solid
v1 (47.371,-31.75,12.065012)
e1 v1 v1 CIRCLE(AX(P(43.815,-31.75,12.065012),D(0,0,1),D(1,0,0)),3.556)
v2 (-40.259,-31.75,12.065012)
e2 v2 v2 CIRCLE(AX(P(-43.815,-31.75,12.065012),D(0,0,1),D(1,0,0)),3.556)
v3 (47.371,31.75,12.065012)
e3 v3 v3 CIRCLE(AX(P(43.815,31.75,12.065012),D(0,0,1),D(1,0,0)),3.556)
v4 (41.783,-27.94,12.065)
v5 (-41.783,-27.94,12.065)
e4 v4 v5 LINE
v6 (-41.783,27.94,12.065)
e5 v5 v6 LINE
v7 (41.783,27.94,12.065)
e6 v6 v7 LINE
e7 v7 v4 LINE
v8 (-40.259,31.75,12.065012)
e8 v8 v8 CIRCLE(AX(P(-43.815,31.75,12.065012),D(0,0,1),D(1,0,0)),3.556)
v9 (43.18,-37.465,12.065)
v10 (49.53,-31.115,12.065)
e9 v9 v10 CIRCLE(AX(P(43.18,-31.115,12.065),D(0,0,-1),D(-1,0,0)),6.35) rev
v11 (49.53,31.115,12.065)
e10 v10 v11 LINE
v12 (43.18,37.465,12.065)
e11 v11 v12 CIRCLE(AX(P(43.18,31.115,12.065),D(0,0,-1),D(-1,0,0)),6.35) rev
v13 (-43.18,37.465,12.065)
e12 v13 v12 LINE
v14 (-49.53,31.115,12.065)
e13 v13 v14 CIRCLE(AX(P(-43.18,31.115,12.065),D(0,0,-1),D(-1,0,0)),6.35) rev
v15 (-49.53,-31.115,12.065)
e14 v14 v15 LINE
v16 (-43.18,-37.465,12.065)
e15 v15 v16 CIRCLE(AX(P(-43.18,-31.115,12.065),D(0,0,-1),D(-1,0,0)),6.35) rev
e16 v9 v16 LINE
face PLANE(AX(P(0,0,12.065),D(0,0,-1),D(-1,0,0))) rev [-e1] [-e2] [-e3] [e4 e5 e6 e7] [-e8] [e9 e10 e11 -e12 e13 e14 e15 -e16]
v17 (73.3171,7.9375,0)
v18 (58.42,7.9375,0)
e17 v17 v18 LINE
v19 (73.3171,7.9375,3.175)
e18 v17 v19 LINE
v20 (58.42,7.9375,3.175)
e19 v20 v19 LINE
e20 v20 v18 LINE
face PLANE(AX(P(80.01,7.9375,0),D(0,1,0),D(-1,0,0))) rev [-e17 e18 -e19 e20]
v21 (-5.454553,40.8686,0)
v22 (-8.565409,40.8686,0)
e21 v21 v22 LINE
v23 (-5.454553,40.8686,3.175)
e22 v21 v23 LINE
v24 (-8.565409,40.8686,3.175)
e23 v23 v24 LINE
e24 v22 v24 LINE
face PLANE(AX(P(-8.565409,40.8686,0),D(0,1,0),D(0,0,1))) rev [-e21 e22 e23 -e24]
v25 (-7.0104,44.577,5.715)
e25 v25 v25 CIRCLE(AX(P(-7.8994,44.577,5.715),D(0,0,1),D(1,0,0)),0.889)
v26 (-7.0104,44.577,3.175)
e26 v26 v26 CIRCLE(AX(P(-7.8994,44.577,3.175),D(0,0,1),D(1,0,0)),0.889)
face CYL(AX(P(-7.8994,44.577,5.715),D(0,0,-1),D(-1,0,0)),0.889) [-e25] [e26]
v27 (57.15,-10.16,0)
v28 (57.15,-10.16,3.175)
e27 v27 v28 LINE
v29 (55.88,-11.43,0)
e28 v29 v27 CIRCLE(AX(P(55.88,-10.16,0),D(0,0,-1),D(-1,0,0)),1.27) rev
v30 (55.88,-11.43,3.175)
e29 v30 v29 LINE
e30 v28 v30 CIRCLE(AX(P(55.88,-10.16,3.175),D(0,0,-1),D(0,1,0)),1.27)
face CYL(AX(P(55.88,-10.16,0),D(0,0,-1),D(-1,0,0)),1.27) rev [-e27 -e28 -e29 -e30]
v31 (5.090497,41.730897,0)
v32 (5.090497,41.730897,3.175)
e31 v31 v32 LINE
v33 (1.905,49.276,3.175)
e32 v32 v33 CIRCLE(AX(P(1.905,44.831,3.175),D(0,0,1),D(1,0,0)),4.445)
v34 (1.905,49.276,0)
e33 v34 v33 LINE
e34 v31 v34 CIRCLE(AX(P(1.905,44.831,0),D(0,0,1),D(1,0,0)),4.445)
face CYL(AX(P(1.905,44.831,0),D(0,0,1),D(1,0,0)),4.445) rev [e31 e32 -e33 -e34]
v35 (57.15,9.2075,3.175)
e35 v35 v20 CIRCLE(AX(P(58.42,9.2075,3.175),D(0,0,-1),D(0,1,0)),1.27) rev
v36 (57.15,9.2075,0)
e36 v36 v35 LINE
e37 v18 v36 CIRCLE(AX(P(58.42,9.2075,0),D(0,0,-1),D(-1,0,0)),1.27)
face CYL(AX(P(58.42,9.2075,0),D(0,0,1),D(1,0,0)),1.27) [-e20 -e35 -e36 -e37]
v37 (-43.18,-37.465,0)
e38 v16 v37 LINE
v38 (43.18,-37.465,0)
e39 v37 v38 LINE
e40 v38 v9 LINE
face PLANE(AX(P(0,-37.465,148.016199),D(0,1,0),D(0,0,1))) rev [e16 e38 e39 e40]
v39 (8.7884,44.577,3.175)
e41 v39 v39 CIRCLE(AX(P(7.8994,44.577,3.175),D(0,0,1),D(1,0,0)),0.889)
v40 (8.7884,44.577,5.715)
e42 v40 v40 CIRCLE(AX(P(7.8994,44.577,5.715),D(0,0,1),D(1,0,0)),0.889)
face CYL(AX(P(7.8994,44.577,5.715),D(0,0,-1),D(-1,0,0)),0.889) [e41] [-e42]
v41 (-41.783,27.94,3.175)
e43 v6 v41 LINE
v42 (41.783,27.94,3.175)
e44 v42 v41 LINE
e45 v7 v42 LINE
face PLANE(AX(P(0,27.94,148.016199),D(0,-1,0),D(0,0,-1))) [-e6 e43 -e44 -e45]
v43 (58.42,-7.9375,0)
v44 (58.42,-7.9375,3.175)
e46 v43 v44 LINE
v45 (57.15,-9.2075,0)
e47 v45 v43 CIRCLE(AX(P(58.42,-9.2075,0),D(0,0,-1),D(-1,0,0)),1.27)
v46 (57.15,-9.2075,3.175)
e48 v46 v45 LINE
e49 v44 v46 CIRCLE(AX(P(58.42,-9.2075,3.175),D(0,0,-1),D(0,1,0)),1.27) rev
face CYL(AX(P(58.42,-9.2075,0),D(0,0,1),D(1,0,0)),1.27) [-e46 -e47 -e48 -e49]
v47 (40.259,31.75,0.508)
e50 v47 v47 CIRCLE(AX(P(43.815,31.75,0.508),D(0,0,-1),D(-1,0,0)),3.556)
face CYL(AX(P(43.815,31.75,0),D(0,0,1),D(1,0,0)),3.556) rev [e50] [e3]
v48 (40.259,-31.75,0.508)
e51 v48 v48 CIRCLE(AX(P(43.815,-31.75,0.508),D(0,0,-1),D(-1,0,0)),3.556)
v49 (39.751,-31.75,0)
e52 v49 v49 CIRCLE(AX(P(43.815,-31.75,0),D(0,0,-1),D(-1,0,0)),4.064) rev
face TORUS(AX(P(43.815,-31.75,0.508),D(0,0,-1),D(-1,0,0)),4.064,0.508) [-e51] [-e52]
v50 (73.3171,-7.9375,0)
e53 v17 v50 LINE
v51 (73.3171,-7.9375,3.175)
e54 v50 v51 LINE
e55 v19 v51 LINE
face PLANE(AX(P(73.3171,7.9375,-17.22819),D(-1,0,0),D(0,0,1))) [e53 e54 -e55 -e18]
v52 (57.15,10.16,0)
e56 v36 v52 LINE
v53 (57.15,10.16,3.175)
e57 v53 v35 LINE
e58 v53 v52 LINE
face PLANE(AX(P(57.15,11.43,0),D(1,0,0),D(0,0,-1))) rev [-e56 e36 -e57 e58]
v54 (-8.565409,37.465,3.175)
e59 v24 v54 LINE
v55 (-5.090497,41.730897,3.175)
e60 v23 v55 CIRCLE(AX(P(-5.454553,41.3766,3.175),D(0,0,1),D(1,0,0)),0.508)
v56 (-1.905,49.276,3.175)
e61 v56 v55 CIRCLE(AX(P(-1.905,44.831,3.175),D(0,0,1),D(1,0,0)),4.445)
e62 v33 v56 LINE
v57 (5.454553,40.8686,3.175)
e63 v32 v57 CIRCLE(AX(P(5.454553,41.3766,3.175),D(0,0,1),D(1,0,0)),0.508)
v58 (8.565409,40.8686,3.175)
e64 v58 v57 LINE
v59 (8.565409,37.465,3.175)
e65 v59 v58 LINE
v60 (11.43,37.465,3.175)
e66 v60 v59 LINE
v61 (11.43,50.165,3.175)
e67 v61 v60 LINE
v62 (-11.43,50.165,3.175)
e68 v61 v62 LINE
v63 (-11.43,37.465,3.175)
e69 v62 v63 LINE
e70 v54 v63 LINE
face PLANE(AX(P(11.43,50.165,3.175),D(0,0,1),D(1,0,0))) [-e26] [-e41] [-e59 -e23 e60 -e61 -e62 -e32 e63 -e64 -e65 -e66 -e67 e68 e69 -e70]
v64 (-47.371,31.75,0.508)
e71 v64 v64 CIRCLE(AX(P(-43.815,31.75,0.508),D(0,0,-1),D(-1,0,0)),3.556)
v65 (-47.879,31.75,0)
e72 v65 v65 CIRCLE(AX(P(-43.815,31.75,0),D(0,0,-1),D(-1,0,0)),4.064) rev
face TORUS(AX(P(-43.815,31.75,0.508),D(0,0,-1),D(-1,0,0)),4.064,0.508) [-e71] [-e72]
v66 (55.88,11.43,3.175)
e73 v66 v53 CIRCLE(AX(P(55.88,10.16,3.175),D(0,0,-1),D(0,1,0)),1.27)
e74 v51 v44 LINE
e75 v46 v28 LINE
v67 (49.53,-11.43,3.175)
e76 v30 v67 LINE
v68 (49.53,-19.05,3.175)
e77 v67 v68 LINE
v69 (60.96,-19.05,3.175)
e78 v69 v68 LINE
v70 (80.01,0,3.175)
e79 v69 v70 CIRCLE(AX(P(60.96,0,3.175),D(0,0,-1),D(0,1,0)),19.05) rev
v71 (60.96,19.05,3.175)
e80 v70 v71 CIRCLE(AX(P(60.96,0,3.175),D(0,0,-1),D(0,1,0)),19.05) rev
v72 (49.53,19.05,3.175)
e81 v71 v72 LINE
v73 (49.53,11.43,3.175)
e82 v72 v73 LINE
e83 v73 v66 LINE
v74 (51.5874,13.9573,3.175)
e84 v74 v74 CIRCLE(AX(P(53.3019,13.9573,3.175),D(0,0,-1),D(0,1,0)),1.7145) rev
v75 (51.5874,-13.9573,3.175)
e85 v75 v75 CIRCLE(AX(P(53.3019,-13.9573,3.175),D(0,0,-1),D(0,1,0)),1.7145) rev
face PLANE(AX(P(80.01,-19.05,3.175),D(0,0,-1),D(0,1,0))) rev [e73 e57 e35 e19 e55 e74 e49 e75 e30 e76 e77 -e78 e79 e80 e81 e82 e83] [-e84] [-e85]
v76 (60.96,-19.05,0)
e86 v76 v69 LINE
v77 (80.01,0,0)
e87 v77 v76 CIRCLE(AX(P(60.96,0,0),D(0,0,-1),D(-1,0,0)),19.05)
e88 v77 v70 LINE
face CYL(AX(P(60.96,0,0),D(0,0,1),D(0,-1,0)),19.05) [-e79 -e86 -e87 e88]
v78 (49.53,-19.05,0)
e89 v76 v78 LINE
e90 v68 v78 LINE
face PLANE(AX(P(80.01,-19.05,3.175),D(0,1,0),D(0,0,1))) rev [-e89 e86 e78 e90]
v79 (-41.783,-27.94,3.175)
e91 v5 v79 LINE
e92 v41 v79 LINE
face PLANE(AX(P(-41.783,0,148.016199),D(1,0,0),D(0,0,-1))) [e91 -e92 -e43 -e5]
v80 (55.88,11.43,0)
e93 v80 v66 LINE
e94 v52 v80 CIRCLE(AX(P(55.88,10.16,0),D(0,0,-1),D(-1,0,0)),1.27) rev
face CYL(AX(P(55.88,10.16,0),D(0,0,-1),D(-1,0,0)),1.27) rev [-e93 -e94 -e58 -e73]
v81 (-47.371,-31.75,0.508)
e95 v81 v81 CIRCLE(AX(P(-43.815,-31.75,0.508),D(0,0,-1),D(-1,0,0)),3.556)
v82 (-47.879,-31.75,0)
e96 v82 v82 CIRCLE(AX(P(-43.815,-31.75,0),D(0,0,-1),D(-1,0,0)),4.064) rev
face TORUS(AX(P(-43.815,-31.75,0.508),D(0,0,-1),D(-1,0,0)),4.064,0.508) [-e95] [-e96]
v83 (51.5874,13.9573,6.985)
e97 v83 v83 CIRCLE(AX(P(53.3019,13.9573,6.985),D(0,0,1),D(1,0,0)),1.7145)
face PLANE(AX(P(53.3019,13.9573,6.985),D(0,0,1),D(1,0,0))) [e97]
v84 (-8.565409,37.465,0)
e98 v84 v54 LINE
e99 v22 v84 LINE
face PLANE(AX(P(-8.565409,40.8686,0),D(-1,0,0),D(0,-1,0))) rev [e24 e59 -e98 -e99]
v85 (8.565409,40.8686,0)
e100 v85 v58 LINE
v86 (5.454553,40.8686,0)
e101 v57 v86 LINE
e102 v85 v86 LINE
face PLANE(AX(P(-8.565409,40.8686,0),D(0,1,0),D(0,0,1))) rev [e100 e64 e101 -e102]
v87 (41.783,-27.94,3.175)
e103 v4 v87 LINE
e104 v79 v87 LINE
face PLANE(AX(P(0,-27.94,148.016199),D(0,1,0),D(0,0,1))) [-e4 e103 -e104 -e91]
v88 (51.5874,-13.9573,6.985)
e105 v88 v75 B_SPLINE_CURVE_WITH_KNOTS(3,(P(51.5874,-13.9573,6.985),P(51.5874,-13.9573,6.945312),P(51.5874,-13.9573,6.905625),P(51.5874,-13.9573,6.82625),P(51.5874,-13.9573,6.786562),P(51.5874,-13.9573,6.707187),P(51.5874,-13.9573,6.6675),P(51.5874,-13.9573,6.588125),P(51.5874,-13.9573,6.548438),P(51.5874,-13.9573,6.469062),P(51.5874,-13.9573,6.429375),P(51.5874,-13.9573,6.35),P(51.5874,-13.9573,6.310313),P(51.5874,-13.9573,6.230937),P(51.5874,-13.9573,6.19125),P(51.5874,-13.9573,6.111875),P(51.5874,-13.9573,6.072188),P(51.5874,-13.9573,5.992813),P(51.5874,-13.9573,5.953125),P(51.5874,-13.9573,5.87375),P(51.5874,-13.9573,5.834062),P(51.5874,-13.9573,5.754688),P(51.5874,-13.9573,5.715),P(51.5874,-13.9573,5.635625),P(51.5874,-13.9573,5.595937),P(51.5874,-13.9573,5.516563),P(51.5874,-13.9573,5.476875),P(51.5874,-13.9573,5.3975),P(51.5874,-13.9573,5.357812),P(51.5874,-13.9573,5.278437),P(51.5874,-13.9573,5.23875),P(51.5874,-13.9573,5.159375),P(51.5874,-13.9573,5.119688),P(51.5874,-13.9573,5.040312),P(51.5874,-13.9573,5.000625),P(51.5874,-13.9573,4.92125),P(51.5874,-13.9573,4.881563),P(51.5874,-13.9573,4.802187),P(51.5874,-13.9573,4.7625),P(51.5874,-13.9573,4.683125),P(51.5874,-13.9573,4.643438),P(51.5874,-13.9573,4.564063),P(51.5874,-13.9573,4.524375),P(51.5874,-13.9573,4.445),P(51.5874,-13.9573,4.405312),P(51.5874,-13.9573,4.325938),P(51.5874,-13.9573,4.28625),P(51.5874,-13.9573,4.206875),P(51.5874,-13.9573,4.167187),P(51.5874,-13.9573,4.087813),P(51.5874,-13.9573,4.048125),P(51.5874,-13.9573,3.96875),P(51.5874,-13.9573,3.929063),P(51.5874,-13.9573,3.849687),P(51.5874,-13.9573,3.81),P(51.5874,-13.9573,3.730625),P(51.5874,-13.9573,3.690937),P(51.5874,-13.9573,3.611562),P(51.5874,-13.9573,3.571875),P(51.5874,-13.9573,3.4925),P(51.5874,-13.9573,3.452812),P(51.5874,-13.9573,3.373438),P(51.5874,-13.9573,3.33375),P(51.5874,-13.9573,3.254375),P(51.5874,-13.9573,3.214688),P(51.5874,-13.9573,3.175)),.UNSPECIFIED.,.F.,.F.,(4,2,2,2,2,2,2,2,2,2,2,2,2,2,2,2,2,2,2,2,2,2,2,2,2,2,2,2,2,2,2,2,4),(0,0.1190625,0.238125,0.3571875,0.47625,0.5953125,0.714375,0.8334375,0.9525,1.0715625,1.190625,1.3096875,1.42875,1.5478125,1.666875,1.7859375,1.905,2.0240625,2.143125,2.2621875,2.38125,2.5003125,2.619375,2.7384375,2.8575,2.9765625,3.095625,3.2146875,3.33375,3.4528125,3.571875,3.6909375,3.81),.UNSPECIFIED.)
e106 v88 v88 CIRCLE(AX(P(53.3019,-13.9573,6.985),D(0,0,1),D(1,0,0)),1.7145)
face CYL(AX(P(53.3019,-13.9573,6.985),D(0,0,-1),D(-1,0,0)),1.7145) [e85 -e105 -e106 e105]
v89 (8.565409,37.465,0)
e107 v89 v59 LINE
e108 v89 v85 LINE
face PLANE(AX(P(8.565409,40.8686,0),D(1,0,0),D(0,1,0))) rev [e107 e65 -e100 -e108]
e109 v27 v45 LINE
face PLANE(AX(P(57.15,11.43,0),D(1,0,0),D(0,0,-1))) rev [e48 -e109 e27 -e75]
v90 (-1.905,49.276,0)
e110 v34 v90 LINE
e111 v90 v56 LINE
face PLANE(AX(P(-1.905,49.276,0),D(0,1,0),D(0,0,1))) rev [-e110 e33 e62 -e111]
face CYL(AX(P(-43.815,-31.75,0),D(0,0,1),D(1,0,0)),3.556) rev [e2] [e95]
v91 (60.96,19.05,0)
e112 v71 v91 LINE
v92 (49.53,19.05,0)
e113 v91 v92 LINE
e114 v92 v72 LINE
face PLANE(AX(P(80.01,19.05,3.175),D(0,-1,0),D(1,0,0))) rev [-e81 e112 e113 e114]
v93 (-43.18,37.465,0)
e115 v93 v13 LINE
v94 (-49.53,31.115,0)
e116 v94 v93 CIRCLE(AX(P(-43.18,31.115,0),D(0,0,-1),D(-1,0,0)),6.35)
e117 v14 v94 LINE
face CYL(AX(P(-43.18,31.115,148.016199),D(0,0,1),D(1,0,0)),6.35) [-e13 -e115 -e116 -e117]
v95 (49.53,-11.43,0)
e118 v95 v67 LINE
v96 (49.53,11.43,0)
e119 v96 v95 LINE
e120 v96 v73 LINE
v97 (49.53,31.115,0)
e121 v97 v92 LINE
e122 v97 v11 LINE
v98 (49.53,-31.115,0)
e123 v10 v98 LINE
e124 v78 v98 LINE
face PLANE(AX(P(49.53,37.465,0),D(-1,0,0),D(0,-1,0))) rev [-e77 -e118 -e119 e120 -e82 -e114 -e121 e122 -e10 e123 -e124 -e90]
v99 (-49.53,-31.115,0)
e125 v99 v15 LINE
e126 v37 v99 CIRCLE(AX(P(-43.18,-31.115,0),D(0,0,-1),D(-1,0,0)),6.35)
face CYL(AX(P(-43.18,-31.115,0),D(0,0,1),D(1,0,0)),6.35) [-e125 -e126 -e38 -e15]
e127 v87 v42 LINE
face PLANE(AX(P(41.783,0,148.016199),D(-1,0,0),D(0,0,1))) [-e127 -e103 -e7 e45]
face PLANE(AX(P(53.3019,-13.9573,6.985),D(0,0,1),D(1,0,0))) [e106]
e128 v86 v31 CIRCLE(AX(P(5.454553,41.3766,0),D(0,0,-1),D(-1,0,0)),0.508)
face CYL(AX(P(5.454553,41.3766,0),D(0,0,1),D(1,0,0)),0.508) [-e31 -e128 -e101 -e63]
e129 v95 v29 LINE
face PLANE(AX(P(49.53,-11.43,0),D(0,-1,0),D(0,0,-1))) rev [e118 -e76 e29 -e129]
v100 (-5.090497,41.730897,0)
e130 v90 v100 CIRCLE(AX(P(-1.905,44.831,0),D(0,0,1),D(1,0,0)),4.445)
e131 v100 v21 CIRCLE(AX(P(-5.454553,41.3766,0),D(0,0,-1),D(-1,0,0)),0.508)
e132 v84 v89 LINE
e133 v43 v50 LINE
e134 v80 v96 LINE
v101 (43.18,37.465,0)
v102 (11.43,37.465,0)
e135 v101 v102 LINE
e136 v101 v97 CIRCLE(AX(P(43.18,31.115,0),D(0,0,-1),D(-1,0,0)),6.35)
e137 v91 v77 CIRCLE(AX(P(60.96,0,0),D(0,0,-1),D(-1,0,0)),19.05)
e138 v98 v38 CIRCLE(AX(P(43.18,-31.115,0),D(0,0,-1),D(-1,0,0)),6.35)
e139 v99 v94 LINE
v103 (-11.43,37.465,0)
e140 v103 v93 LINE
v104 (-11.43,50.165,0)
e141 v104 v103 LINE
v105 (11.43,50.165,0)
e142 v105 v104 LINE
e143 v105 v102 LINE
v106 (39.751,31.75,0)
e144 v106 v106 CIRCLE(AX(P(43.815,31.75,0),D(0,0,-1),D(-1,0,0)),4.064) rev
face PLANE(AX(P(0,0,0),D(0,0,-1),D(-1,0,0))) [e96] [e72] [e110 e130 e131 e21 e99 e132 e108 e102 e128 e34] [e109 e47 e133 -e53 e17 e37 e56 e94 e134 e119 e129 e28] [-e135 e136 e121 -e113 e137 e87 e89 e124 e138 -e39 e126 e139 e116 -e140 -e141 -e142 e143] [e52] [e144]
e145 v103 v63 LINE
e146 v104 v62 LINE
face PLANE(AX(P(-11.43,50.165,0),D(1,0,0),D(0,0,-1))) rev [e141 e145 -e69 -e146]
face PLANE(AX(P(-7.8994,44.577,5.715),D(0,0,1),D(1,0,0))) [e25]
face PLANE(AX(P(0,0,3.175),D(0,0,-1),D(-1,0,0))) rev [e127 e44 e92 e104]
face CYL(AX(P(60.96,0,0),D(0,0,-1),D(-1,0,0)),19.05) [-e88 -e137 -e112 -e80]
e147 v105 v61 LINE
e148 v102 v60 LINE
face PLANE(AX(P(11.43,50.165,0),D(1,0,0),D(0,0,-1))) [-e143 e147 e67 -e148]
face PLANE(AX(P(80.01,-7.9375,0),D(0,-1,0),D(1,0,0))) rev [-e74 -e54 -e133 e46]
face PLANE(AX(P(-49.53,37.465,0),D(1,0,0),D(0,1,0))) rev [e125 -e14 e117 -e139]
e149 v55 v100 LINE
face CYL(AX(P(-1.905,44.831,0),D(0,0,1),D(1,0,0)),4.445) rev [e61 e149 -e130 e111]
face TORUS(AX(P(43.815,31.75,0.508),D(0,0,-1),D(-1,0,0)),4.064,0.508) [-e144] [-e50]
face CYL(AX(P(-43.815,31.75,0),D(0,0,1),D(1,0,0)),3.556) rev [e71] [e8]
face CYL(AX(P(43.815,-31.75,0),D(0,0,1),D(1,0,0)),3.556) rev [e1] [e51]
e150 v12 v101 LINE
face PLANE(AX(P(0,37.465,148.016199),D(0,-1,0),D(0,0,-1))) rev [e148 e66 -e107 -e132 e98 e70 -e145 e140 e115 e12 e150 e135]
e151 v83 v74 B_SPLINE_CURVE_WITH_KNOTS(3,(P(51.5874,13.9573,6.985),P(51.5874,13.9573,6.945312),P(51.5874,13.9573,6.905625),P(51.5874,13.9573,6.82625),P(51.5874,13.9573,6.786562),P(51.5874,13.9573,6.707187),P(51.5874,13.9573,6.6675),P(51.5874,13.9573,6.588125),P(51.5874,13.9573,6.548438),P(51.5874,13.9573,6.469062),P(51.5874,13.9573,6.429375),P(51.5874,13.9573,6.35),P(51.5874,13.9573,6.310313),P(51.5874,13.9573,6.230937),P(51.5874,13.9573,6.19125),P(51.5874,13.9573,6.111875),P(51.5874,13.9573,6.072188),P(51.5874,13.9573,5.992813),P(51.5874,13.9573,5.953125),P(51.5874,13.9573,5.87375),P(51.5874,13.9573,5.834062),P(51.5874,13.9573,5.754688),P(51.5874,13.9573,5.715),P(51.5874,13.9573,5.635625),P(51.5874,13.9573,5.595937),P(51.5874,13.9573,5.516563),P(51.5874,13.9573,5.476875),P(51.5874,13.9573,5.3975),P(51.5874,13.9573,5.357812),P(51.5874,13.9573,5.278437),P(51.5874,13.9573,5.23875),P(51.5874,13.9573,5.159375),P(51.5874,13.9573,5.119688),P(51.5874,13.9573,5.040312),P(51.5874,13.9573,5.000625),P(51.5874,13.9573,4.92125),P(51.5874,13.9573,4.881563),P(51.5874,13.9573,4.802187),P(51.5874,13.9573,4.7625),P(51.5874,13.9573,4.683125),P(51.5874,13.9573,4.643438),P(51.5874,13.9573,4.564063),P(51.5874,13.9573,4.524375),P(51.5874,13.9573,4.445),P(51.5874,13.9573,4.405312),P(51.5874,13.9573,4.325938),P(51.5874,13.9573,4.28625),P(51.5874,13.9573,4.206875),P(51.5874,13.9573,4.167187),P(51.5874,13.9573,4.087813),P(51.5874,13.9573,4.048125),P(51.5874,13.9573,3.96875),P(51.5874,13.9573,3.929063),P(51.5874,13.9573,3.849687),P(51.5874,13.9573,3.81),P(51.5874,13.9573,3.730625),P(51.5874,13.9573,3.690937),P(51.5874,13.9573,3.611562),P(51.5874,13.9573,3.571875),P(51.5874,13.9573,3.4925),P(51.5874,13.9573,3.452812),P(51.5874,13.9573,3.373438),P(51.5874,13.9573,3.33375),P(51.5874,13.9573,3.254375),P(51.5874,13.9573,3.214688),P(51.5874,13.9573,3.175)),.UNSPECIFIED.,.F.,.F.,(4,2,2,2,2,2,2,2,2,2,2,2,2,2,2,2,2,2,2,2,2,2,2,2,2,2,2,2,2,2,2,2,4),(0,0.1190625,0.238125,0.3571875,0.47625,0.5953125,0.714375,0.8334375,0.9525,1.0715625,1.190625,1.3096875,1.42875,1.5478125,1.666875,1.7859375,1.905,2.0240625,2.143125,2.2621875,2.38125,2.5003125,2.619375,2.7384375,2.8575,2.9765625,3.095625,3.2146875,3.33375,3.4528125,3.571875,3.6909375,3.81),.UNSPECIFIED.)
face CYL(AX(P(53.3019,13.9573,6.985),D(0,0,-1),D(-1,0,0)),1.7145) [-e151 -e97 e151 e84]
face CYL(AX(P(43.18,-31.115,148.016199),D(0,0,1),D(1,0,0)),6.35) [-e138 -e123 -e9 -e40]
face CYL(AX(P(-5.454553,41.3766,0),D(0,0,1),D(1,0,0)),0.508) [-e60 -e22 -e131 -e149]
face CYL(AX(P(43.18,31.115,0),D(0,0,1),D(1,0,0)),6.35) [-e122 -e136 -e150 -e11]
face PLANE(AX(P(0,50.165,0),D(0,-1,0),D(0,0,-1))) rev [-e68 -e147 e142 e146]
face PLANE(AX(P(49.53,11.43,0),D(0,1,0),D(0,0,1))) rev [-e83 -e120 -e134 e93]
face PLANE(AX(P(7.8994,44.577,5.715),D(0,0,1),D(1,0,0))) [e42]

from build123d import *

# Parameters (mm, degrees)
SKETCH1_W               = 55.88
SKETCH1_H               = 83.566
BOSS_EXTRUDE1_DEPTH     = 3.175
SKETCH2_W               = 74.93
SKETCH2_H               = 102.616
SKETCH2_W_2             = 55.88
SKETCH2_H_2             = 83.566
BOSS_EXTRUDE2_DEPTH     = 12.065
CUT_EXTRUDE1_DEPTH      = 65.666075449
CUT_EXTRUDE1_DEPTH_BACK = 65.666075449
SKETCH3_R               = 3.556
CUT_EXTRUDE2_DEPTH      = 65.666075449
CUT_EXTRUDE2_DEPTH_BACK = 65.666075449
SKETCH4_W               = 1.778
SKETCH4_H               = 74.93
FILLET1_R               = 6.35
FILLET2_R               = 0.508
SKETCH5_W               = 38.1
SKETCH5_H               = 3.175
BOSS_EXTRUDE3_DEPTH     = 30.48
CUT_EXTRUDE3_DEPTH      = 89.793346738
CUT_EXTRUDE3_DEPTH_BACK = 89.793346738
SKETCH6_W               = 7.62
SKETCH6_H               = 22.86
SKETCH7_R               = 1.7145
BOSS_EXTRUDE4_DEPTH     = 3.81
CUT_EXTRUDE4_DEPTH      = 89.793346738
CUT_EXTRUDE4_DEPTH_BACK = 89.793346738
SKETCH8_W               = 22.86
SKETCH8_H               = 15.875
SKETCH9_W               = 6.6929
SKETCH9_H               = 15.875
BOSS_EXTRUDE5_DEPTH     = 3.175
FILLET3_R               = 19.05
FILLET5_R               = 1.27
SKETCH14_W              = 22.86
SKETCH14_H              = 3.175
BOSS_EXTRUDE8_DEPTH     = 12.7
CUT_EXTRUDE7_DEPTH      = 95.853357479
CUT_EXTRUDE7_DEPTH_BACK = 95.853357479
CUT_EXTRUDE8_DEPTH      = 95.853357479
CUT_EXTRUDE8_DEPTH_BACK = 95.853357479
SKETCH16_W              = 17.130818864
SKETCH16_H              = 3.4036
FILLET8_R               = 0.508
SKETCH17_R              = 0.889
BOSS_EXTRUDE9_DEPTH     = 2.54


with BuildPart() as part:
    # Sketch1 → Boss-Extrude1 (new body)
    with BuildSketch(Plane(origin=(0, 0, 0), x_dir=(0, 1, 0), z_dir=(0, 0, 1))):
        Rectangle(SKETCH1_W, SKETCH1_H)
    extrude(amount=BOSS_EXTRUDE1_DEPTH)

    # Sketch2 → Boss-Extrude2 (add)
    with BuildSketch(Plane(origin=(0, 0, 0), x_dir=(0, 1, 0), z_dir=(0, 0, 1))):
        Rectangle(SKETCH2_W, SKETCH2_H)
        Rectangle(SKETCH2_W_2, SKETCH2_H_2, mode=Mode.SUBTRACT)
    extrude(amount=BOSS_EXTRUDE2_DEPTH)

    # Sketch3 → Cut-Extrude1 (cut, two sides: drawn at the far end of the back side and taken through both)
    with BuildSketch(Plane.XY.offset(12.065).offset(-CUT_EXTRUDE1_DEPTH_BACK)):
        with Locations((-43.815, 31.75)):
            Circle(SKETCH3_R)
        with Locations((43.815, 31.75)):
            Circle(SKETCH3_R)
        with Locations((43.815, -31.75)):
            Circle(SKETCH3_R)
        with Locations((-43.815, -31.75)):
            Circle(SKETCH3_R)
    extrude(amount=CUT_EXTRUDE1_DEPTH + CUT_EXTRUDE1_DEPTH_BACK, mode=Mode.SUBTRACT)

    # Sketch4 → Cut-Extrude2 (cut, two sides: drawn at the far end of the back side and taken through both)
    with BuildSketch(Plane.XY.offset(12.065).offset(-CUT_EXTRUDE2_DEPTH_BACK)):
        with Locations((-50.419, 0)):
            Rectangle(SKETCH4_W, SKETCH4_H)
        with Locations((50.419, 0)):
            Rectangle(SKETCH4_W, SKETCH4_H)
    extrude(amount=CUT_EXTRUDE2_DEPTH + CUT_EXTRUDE2_DEPTH_BACK, mode=Mode.SUBTRACT)

    # Fillet1
    fillet1_edges = [part.edges().sort_by_distance(p)[0] for p in [
        (-49.53, -37.465, 6.0325),
        (-49.53, 37.465, 6.0325),
        (49.53, 37.465, 6.0325),
        (49.53, -37.465, 6.0325),
    ]]
    fillet(fillet1_edges, radius=FILLET1_R)

    # Fillet2
    fillet2_edges = [part.edges().sort_by_distance(p)[0] for p in [
        (-47.371, -31.75, 0),
        (40.259, -31.75, 0),
        (40.259, 31.75, 0),
        (-47.371, 31.75, 0),
    ]]
    fillet(fillet2_edges, radius=FILLET2_R)

    # Sketch5 → Boss-Extrude3 (add)
    with BuildSketch(Plane.YZ.offset(49.53)):
        with Locations((0, 1.5875)):
            Rectangle(SKETCH5_W, SKETCH5_H)
    extrude(amount=BOSS_EXTRUDE3_DEPTH)

    # Sketch6 → Cut-Extrude3 (cut, two sides: drawn at the far end of the back side and taken through both)
    with BuildSketch(Plane.XY.offset(3.175).offset(-CUT_EXTRUDE3_DEPTH_BACK)):
        with Locations((53.34, 0)):
            Rectangle(SKETCH6_W, SKETCH6_H)
    extrude(amount=CUT_EXTRUDE3_DEPTH + CUT_EXTRUDE3_DEPTH_BACK, mode=Mode.SUBTRACT)

    # Sketch7 → Boss-Extrude4 (add)
    with BuildSketch(Plane.XY.offset(3.175)):
        with Locations(Location((53.3019, 13.9573, 0), (0, 0, 180))):
            Circle(SKETCH7_R)
        with Locations(Location((53.3019, -13.9573, 0), (0, 0, 180))):
            Circle(SKETCH7_R)
    extrude(amount=BOSS_EXTRUDE4_DEPTH)

    # Sketch8 → Cut-Extrude4 (cut, two sides: drawn at the far end of the back side and taken through both)
    with BuildSketch(Plane.XY.offset(3.175).offset(-CUT_EXTRUDE4_DEPTH_BACK)):
        with Locations((68.58, 0)):
            Rectangle(SKETCH8_W, SKETCH8_H)
    extrude(amount=CUT_EXTRUDE4_DEPTH + CUT_EXTRUDE4_DEPTH_BACK, mode=Mode.SUBTRACT)

    # Sketch9 → Boss-Extrude5 (add)
    with BuildSketch(Plane.XY.offset(3.175)):
        with Locations((76.66355, 0)):
            Rectangle(SKETCH9_W, SKETCH9_H)
    extrude(amount=-BOSS_EXTRUDE5_DEPTH)

    # Fillet3
    fillet3_edges = [part.edges().sort_by_distance(p)[0] for p in [
        (80.01, -19.05, 1.5875),
        (80.01, 19.05, 1.5875),
    ]]
    fillet(fillet3_edges, radius=FILLET3_R - 0.0001)  # a hair under: the kernel refuses the full size

    # Fillet5
    fillet5_edges = [part.edges().sort_by_distance(p)[0] for p in [
        (57.15, 11.43, 1.5875),
        (57.15, -11.43, 1.5875),
        (57.15, 7.9375, 1.5875),
        (57.15, -7.9375, 1.5875),
    ]]
    fillet(fillet5_edges, radius=FILLET5_R)

    # Sketch14 → Boss-Extrude8 (add)
    with BuildSketch(Plane(origin=(0, 37.465, 0), x_dir=(-1, 0, 0), z_dir=(0, 1, 0))):
        with Locations((0, 1.5875)):
            Rectangle(SKETCH14_W, SKETCH14_H)
    extrude(amount=BOSS_EXTRUDE8_DEPTH)

    # Sketch15 → Cut-Extrude7 (cut, two sides: drawn at the far end of the back side and taken through both)
    with BuildSketch(Plane.XY.offset(3.175).offset(-CUT_EXTRUDE7_DEPTH_BACK)):
        with BuildLine():
            Line((-1.905, 49.276), (1.905, 49.276))
            ThreePointArc((1.905, 49.276), (6.35, 44.831), (1.905, 40.386))
            Line((1.905, 40.386), (-1.905, 40.386))
            ThreePointArc((-1.905, 40.386), (-6.35, 44.831), (-1.905, 49.276))
        make_face()
    extrude(amount=CUT_EXTRUDE7_DEPTH + CUT_EXTRUDE7_DEPTH_BACK, mode=Mode.SUBTRACT)

    # Sketch16 → Cut-Extrude8 (cut, two sides: drawn at the far end of the back side and taken through both)
    with BuildSketch(Plane.XY.offset(3.175).offset(-CUT_EXTRUDE8_DEPTH_BACK)):
        with Locations((0, 39.1668)):
            Rectangle(SKETCH16_W, SKETCH16_H)
    extrude(amount=CUT_EXTRUDE8_DEPTH + CUT_EXTRUDE8_DEPTH_BACK, mode=Mode.SUBTRACT)

    # Fillet8
    fillet8_edges = [part.edges().sort_by_distance(p)[0] for p in [
        (3.919301676, 40.8686, 1.5875),
        (-3.919301676, 40.8686, 1.5875),
    ]]
    fillet(fillet8_edges, radius=FILLET8_R)

    # Sketch17 → Boss-Extrude9 (add)
    with BuildSketch(Plane.XY.offset(3.175)):
        with Locations((-7.8994, 44.577)):
            Circle(SKETCH17_R)
        with Locations((7.8994, 44.577)):
            Circle(SKETCH17_R)
    extrude(amount=BOSS_EXTRUDE9_DEPTH)


solid = part.part
